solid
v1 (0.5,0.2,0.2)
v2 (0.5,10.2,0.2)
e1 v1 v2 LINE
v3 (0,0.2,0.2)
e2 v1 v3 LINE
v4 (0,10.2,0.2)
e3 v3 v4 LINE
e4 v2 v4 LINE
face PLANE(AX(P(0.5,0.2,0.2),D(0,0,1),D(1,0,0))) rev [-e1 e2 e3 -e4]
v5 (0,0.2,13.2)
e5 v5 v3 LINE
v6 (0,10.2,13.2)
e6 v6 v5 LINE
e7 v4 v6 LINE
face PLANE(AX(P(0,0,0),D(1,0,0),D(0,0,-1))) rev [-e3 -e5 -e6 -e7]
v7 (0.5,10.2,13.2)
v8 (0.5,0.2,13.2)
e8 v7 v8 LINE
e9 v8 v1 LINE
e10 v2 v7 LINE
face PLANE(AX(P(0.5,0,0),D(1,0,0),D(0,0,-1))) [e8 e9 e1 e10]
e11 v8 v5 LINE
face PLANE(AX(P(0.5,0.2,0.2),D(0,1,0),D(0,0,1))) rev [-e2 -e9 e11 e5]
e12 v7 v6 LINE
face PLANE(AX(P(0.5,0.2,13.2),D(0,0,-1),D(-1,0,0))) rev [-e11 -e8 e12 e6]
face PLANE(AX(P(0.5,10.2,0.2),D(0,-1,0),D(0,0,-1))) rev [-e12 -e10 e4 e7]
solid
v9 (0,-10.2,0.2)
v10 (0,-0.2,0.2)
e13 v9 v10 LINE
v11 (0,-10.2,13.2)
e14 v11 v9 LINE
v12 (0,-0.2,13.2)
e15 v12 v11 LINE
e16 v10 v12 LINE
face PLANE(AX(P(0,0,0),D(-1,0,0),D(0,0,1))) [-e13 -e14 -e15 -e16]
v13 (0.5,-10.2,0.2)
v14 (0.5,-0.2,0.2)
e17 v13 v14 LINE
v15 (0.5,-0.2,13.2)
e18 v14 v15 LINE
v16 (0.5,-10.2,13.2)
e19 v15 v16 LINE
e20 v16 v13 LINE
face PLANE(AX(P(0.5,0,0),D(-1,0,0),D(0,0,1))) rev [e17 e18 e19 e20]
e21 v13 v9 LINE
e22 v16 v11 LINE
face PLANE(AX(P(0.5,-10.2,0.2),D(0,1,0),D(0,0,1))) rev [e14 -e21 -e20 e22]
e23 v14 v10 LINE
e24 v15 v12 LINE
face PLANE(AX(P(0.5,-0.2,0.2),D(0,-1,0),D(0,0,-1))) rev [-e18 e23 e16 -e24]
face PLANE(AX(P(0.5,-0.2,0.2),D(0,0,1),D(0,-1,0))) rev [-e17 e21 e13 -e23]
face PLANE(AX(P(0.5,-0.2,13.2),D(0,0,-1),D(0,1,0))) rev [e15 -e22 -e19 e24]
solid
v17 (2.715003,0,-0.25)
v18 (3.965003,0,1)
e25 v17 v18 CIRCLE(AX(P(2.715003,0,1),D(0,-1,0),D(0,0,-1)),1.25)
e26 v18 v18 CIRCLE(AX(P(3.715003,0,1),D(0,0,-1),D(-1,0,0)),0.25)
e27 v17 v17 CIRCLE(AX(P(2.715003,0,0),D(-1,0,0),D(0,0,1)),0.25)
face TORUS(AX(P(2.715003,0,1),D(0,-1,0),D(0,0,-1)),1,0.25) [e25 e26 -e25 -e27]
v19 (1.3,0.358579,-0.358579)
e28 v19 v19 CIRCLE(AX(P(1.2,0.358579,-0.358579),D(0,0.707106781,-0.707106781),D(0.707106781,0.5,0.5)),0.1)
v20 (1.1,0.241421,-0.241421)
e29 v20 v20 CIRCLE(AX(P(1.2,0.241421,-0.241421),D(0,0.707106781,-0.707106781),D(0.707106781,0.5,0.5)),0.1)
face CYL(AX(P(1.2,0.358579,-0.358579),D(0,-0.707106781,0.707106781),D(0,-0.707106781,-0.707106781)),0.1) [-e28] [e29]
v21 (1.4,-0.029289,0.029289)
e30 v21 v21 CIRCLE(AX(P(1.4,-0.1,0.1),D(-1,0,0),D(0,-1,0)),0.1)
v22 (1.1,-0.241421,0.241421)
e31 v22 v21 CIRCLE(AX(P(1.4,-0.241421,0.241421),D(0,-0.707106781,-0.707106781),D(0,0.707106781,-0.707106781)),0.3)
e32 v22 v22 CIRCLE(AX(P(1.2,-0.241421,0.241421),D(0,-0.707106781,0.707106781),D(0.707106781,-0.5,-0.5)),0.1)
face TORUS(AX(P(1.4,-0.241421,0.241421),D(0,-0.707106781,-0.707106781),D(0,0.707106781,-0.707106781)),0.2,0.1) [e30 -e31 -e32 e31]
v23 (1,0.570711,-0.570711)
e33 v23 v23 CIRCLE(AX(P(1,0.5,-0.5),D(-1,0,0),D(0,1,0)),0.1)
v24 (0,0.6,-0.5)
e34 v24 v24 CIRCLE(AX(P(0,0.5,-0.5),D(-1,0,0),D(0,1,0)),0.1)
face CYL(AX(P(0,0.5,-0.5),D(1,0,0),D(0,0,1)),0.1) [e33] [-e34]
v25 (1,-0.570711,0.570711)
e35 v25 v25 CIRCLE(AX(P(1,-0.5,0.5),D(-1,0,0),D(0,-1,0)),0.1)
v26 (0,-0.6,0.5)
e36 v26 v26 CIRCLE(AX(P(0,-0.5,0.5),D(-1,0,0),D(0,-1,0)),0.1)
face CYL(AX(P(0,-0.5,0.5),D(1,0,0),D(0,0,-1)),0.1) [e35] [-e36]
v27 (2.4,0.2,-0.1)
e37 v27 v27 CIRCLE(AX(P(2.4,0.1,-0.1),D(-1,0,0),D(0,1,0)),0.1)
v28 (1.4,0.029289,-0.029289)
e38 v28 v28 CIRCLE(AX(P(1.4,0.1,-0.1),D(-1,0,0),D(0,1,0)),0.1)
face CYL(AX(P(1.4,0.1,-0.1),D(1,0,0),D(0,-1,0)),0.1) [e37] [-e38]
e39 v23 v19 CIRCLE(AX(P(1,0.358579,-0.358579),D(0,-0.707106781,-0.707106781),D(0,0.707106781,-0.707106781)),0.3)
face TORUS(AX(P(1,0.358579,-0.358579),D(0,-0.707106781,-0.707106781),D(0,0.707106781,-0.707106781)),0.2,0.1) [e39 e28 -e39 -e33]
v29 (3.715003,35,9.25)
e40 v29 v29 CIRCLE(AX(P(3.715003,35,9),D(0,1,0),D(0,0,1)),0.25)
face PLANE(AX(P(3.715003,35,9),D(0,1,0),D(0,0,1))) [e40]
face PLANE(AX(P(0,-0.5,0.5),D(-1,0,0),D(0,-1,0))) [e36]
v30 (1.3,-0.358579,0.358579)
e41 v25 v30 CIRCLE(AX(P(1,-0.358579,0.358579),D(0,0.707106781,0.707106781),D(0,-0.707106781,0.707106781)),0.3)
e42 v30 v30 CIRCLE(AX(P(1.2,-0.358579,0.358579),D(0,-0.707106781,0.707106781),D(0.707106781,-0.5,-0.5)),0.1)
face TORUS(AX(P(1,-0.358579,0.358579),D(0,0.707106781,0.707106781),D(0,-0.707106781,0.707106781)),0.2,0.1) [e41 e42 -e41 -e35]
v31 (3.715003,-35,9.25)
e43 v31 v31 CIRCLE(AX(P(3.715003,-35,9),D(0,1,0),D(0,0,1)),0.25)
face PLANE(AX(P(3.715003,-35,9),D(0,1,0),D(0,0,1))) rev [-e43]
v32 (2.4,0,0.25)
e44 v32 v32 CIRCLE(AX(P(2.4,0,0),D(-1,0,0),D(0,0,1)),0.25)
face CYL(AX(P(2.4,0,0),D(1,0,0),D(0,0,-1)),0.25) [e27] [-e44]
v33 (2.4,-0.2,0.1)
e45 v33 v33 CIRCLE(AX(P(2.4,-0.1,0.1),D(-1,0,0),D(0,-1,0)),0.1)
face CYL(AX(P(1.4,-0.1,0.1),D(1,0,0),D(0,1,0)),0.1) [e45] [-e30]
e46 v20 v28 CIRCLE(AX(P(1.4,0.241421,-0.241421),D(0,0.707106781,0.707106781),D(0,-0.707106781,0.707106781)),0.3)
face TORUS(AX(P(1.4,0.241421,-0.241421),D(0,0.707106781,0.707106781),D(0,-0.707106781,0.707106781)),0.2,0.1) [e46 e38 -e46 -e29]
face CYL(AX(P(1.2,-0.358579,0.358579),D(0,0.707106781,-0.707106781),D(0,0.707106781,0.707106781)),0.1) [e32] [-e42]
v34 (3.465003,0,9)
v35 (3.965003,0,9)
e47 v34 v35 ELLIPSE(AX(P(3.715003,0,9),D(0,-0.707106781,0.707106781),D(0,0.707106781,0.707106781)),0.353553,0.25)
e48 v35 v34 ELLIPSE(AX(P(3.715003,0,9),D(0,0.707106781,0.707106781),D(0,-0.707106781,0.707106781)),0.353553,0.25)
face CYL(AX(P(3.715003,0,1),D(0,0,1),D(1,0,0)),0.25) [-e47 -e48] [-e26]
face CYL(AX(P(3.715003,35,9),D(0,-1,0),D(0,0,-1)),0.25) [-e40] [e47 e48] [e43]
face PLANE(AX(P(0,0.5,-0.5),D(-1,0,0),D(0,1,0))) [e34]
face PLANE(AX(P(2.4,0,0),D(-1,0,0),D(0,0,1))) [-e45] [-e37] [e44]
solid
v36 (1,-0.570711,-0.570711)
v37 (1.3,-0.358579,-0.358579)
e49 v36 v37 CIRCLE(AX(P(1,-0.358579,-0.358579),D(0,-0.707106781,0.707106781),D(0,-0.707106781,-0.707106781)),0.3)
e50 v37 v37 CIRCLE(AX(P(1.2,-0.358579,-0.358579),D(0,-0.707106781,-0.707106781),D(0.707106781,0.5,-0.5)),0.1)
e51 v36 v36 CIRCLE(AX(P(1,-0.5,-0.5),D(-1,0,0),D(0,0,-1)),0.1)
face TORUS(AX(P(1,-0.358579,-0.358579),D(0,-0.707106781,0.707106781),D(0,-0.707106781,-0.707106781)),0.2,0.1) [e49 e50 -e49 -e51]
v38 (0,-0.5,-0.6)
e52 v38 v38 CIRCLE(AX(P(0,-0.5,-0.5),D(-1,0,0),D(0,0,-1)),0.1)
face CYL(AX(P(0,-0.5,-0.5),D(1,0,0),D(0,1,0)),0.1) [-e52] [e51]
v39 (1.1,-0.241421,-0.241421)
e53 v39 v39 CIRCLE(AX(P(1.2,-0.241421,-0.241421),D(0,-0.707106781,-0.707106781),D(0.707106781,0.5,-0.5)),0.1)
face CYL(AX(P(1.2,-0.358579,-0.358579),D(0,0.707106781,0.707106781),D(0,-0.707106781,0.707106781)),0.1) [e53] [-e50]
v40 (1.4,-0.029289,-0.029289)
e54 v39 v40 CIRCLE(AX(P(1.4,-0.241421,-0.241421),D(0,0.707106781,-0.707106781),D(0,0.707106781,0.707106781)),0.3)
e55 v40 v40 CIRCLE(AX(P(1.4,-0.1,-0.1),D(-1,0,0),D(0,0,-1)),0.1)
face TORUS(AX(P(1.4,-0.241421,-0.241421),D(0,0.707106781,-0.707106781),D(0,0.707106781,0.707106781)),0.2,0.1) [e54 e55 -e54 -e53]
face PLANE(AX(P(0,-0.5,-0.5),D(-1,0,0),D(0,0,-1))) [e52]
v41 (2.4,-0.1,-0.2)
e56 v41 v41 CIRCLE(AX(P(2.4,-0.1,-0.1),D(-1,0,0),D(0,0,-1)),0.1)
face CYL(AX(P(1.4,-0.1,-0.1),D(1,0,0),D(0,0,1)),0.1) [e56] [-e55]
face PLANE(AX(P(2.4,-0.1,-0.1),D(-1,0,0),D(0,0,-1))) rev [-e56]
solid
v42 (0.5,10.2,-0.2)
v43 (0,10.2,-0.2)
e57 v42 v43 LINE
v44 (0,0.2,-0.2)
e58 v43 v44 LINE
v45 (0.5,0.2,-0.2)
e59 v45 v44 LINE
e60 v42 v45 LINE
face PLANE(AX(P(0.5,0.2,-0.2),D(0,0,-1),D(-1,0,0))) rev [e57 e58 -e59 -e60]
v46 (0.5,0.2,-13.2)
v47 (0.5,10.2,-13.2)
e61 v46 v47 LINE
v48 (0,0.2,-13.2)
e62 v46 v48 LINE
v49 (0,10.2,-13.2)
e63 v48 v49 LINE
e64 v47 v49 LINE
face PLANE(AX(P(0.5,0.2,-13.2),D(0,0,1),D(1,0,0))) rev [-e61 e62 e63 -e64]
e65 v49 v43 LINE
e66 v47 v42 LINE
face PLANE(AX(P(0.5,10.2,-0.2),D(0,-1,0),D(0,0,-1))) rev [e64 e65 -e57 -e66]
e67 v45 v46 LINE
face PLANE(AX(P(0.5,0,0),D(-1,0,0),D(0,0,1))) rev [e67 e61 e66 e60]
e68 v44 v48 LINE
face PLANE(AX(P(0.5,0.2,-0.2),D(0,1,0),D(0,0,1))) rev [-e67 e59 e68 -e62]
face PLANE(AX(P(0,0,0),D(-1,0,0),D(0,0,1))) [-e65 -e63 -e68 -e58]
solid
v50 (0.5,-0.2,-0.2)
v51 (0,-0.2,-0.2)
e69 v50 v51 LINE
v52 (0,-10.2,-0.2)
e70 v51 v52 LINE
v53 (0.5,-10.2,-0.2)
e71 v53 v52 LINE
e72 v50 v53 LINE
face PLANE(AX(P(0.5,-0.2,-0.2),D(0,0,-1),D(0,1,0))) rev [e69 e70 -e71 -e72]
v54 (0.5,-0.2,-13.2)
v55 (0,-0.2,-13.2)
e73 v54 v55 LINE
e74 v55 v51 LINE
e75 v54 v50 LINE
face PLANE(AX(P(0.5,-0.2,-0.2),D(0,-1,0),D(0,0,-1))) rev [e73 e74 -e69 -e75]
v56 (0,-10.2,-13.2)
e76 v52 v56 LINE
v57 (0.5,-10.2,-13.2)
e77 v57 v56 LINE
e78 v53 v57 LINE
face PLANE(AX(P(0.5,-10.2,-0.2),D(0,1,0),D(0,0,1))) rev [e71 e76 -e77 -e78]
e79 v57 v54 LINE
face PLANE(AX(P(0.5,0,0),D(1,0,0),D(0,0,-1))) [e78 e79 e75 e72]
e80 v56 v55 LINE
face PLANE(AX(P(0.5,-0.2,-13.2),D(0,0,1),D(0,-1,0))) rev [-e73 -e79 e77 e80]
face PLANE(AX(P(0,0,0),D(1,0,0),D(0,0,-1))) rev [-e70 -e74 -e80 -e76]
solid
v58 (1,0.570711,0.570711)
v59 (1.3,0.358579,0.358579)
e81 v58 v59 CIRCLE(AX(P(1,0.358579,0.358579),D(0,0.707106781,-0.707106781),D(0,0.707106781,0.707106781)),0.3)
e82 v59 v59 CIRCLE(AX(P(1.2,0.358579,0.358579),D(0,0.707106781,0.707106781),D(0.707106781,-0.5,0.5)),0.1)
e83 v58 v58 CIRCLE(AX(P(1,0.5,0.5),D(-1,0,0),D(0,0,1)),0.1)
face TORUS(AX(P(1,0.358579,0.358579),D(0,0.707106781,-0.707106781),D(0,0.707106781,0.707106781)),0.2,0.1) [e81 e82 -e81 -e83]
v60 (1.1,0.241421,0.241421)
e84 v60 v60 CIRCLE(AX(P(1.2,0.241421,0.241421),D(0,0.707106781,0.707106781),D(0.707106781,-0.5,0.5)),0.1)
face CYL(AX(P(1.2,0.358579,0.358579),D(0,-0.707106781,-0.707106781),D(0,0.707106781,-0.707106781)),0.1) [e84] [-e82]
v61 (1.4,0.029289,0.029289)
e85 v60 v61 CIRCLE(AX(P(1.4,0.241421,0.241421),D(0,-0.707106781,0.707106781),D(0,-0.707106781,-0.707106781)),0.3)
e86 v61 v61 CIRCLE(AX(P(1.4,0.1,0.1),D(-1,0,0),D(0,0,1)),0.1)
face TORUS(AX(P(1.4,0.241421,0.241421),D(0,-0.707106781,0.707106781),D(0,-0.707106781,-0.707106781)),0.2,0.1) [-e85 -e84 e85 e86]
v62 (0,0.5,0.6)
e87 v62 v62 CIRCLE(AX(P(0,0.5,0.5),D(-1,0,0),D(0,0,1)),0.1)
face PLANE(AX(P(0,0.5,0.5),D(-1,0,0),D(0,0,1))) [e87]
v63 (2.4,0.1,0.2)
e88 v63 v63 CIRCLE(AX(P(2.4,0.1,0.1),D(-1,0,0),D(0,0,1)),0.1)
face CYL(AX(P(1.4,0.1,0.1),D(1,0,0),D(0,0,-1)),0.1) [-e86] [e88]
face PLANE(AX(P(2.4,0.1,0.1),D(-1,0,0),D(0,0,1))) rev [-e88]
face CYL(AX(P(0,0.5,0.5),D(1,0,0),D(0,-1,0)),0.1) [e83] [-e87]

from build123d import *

# Parameters (mm, degrees)
SKETCH_3_W               = 13
SKETCH_3_H               = 10
EXTRUDE_1_DEPTH          = 0.5
EXTRUDE_1_2_DEPTH        = 0.5
EXTRUDE_1_3_DEPTH        = 0.5
EXTRUDE_1_4_DEPTH        = 0.5
SWEEP_4_PROFILE_R        = 0.1
MOVE_BODY_3_OUTLINE_R    = 0.1
MOVE_BODY_3_ANGLE        = 90
MOVE_BODY_3_2_OUTLINE_R  = 0.1
MOVE_BODY_3_2_ANGLE      = 90
MOVE_BODY_3_3_OUTLINE_R  = 0.1
MOVE_BODY_3_3_DEPTH      = 1.0000001
MOVE_START               = 0.341421256
MOVE_BODY_3_4_OUTLINE_R  = 0.1
MOVE_BODY_3_4_DEPTH      = 0.165685625
MOVE_START_2             = 1.3999999
MOVE_BODY_3_5_OUTLINE_R  = 0.1
MOVE_BODY_3_5_DEPTH      = 1.0000001
MOVE_BODY_3_6_OUTLINE_R  = 0.1
MOVE_BODY_3_6_ANGLE      = 90
MOVE_BODY_3_7_OUTLINE_R  = 0.1
MOVE_BODY_3_7_ANGLE      = 90
MOVE_BODY_3_8_OUTLINE_R  = 0.1
MOVE_BODY_3_8_DEPTH      = 1.0000001
MOVE_START_3             = -0.507106881
MOVE_BODY_3_9_OUTLINE_R  = 0.1
MOVE_BODY_3_9_DEPTH      = 0.165685625
MOVE_BODY_3_10_OUTLINE_R = 0.1
MOVE_BODY_3_10_DEPTH     = 1.0000001
MOVE_BODY_3_11_OUTLINE_R = 0.1
MOVE_BODY_3_11_ANGLE     = 90
MOVE_BODY_3_12_OUTLINE_R = 0.1
MOVE_BODY_3_12_ANGLE     = 90
MOVE_BODY_3_13_OUTLINE_R = 0.1
MOVE_BODY_3_13_DEPTH     = 1.0000001
MOVE_BODY_3_14_OUTLINE_R = 0.1
MOVE_BODY_3_14_DEPTH     = 0.165685625
MOVE_BODY_3_15_OUTLINE_R = 0.1
MOVE_BODY_3_15_DEPTH     = 1.0000001
SWEEP_9_PROFILE_R        = 0.25
SKETCH_78_R              = 0.25
EXTRUDE_2_DEPTH          = 35


with BuildPart() as part:
    # 草图3 → 凸台-拉伸1 (new body)
    with BuildSketch(Plane(origin=(0, 0, 0), x_dir=(0, 0, -1), z_dir=(1, 0, 0))):
        with Locations((6.7, 5.2)):
            Rectangle(SKETCH_3_W, SKETCH_3_H)
    extrude(amount=EXTRUDE_1_DEPTH)


with BuildPart() as body_2:
    # 草图3 → Extrude 1 2 (new body)
    with BuildSketch(Plane(origin=(0, 0, 0), x_dir=(0, 0, -1), z_dir=(1, 0, 0))):
        with Locations((-6.7, -5.2)):
            Rectangle(SKETCH_3_W, SKETCH_3_H)
    extrude(amount=EXTRUDE_1_2_DEPTH)


with BuildPart() as body_3:
    # 草图3 → Extrude 1 3 (new body)
    with BuildSketch(Plane(origin=(0, 0, 0), x_dir=(0, 0, -1), z_dir=(1, 0, 0))):
        with Locations((6.7, -5.2)):
            Rectangle(SKETCH_3_W, SKETCH_3_H)
    extrude(amount=EXTRUDE_1_3_DEPTH)


with BuildPart() as body_4:
    # 草图3 → Extrude 1 4 (new body)
    with BuildSketch(Plane(origin=(0, 0, 0), x_dir=(0, 0, -1), z_dir=(1, 0, 0))):
        with Locations((-6.7, 5.2)):
            Rectangle(SKETCH_3_W, SKETCH_3_H)
    extrude(amount=EXTRUDE_1_4_DEPTH)


with BuildPart() as body_5:
    # 扫描4: sweep along a curve in space
    with BuildLine() as sweep_4_path:
        Line((0, -0.5, 0.5), (1, -0.5, 0.5))
        ThreePointArc((1, -0.5, 0.5), (1.141421356, -0.458578644, 0.458578644), (1.2, -0.358578644, 0.358578644))
        Line((1.2, -0.241421356, 0.241421356), (1.2, -0.358578644, 0.358578644))
        ThreePointArc((1.4, -0.1, 0.1), (1.258578644, -0.141421356, 0.141421356), (1.2, -0.241421356, 0.241421356))
        Line((1.4, -0.1, 0.1), (2.4, -0.1, 0.1))
    # 扫描4 profile (on start of the path) → 扫描4 (sweep)
    with BuildSketch(Plane(origin=(0, -0.5, 0.5), x_dir=(0, 0, 1), z_dir=(1, 0, 0))):
        Circle(SWEEP_4_PROFILE_R)
    sweep(path=sweep_4_path.line)



with BuildPart() as body_6:
    # Move Body 3: read off the stored shape, not the designer's step
    # Move Body 3 outline → Move Body 3 (revolve)
    with BuildSketch(Plane(origin=(1, 0.358578644, 0.358578644), x_dir=(0, 0.7071067811865401, 0.7071067811865551), z_dir=(-1, 0, 0))):
        with Locations((0.2, 0)):
            Circle(MOVE_BODY_3_OUTLINE_R)
    revolve(axis=Axis((1, 0.358578644, 0.358578644), (0, 0.7071067811865555, -0.7071067811865405)), revolution_arc=MOVE_BODY_3_ANGLE)

    # Move Body 3 2 outline → Move Body 3 2 (revolve)
    with BuildSketch(Plane(origin=(1.4, 0.241421356, 0.241421356), x_dir=(0, -0.7071067811865401, -0.7071067811865551), z_dir=(1, 0, 0))):
        with Locations((0.2, 0)):
            Circle(MOVE_BODY_3_2_OUTLINE_R)
    revolve(axis=Axis((1.4, 0.241421356, 0.241421356), (0, 0.7071067811865555, -0.7071067811865405)), revolution_arc=MOVE_BODY_3_2_ANGLE)

    # Move Body 3 3 outline → Move Body 3 3 (add)
    with BuildSketch(Plane.YZ):
        with Locations((0.5, 0.5)):
            Circle(MOVE_BODY_3_3_OUTLINE_R)
    extrude(amount=MOVE_BODY_3_3_DEPTH)

    # Move Body 3 4 outline → Move Body 3 4 (add)
    with BuildSketch(Plane(origin=(0, 0, 0), x_dir=(1, 0, 0), z_dir=(0, 0.70710678118654, 0.707106781186555)).offset(MOVE_START)):
        with Locations((1.2, 0)):
            Circle(MOVE_BODY_3_4_OUTLINE_R)
    extrude(amount=MOVE_BODY_3_4_DEPTH)

    # Move Body 3 5 outline → Move Body 3 5 (add)
    with BuildSketch(Plane.YZ.offset(MOVE_START_2)):
        with Locations((0.1, 0.1)):
            Circle(MOVE_BODY_3_5_OUTLINE_R)
    extrude(amount=MOVE_BODY_3_5_DEPTH)


with BuildPart() as body_7:
    # Move Body 3 6 outline → Move Body 3 6 (revolve)
    with BuildSketch(Plane(origin=(1, -0.358578644, -0.358578644), x_dir=(1, 0, 0), z_dir=(0, 0.707106781186545, 0.70710678118655))):
        with Locations((0.2, 0)):
            Circle(MOVE_BODY_3_6_OUTLINE_R)
    revolve(axis=Axis((1, -0.358578644, -0.358578644), (0, 0.70710678118655, -0.707106781186545)), revolution_arc=MOVE_BODY_3_6_ANGLE)

    # Move Body 3 7 outline → Move Body 3 7 (revolve)
    with BuildSketch(Plane(origin=(1.4, -0.241421356, -0.241421356), x_dir=(-1, 0, 0), z_dir=(-2.3429107291650482e-15, -0.707106781186545, -0.70710678118655))):
        with Locations((0.2, 0)):
            Circle(MOVE_BODY_3_7_OUTLINE_R)
    revolve(axis=Axis((1.4, -0.241421356, -0.241421356), (0, 0.70710678118655, -0.707106781186545)), revolution_arc=MOVE_BODY_3_7_ANGLE)

    # Move Body 3 8 outline → Move Body 3 8 (add)
    with BuildSketch(Plane.YZ):
        with Locations((-0.5, -0.5)):
            Circle(MOVE_BODY_3_8_OUTLINE_R)
    extrude(amount=MOVE_BODY_3_8_DEPTH)

    # Move Body 3 9 outline → Move Body 3 9 (add)
    with BuildSketch(Plane(origin=(0, 0, 0), x_dir=(1, 0, 0), z_dir=(0, 0.707106781186545, 0.70710678118655)).offset(MOVE_START_3)):
        with Locations((1.2, 0)):
            Circle(MOVE_BODY_3_9_OUTLINE_R)
    extrude(amount=MOVE_BODY_3_9_DEPTH)

    # Move Body 3 10 outline → Move Body 3 10 (add)
    with BuildSketch(Plane.YZ.offset(MOVE_START_2)):
        with Locations((-0.1, -0.1)):
            Circle(MOVE_BODY_3_10_OUTLINE_R)
    extrude(amount=MOVE_BODY_3_10_DEPTH)


with BuildPart() as body_8:
    # Move Body 3 11 outline → Move Body 3 11 (revolve)
    with BuildSketch(Plane(origin=(1, 0.358578644, -0.358578644), x_dir=(1, 0, 0), z_dir=(0, -0.707106781186552, 0.707106781186543))):
        with Locations((0.2, 0)):
            Circle(MOVE_BODY_3_11_OUTLINE_R)
    revolve(axis=Axis((1, 0.358578644, -0.358578644), (0, 0.707106781186543, 0.707106781186552)), revolution_arc=MOVE_BODY_3_11_ANGLE)

    # Move Body 3 12 outline → Move Body 3 12 (revolve)
    with BuildSketch(Plane(origin=(1.4, 0.241421356, -0.241421356), x_dir=(-1, 0, 0), z_dir=(0, 0.707106781186552, -0.707106781186543))):
        with Locations((0.2, 0)):
            Circle(MOVE_BODY_3_12_OUTLINE_R)
    revolve(axis=Axis((1.4, 0.241421356, -0.241421356), (0, 0.707106781186543, 0.707106781186552)), revolution_arc=MOVE_BODY_3_12_ANGLE)

    # Move Body 3 13 outline → Move Body 3 13 (add)
    with BuildSketch(Plane.YZ):
        with Locations((0.5, -0.5)):
            Circle(MOVE_BODY_3_13_OUTLINE_R)
    extrude(amount=MOVE_BODY_3_13_DEPTH)

    # Move Body 3 14 outline → Move Body 3 14 (add)
    with BuildSketch(Plane(origin=(0, 0, 0), x_dir=(1, 0, 0), z_dir=(0, 0.707106781186552, -0.707106781186543)).offset(MOVE_START)):
        with Locations((1.2, 0)):
            Circle(MOVE_BODY_3_14_OUTLINE_R)
    extrude(amount=MOVE_BODY_3_14_DEPTH)

    # Move Body 3 15 outline → Move Body 3 15 (add)
    with BuildSketch(Plane.YZ.offset(MOVE_START_2)):
        with Locations((0.1, -0.1)):
            Circle(MOVE_BODY_3_15_OUTLINE_R)
    extrude(amount=MOVE_BODY_3_15_DEPTH)


with BuildPart() as body_5_1:
    add(body_5.part)

    add(body_8.part)  # 扫描9 merges body 8
    # 扫描9: sweep along a path in 草图65
    with BuildLine(Plane(origin=(0, 0, 0), x_dir=(1, 0, 0), z_dir=(0, 1, 0))) as sweep_9_path:
        Line((2.4, 0), (2.715003177, 0))
        ThreePointArc((2.715003177, 0), (3.422109958, -0.292893219), (3.715003177, -1))
        Line((3.715003177, -1), (3.715003177, -9))
    # 扫描9 profile (on start of the path) → 扫描9 (sweep)
    with BuildSketch(Plane(origin=(2.4, 0, 0), x_dir=(0, 0, 1), z_dir=(1, 0, 0))):
        Circle(SWEEP_9_PROFILE_R)
    sweep(path=sweep_9_path.line)

    # 草图78 → 凸台-拉伸2 (add, symmetric)
    with BuildSketch(Plane(origin=(0, 0, 0), x_dir=(1, 0, 0), z_dir=(0, 1, 0))):
        with Locations(Location((3.715003177, -9, 0), (0, 0, 270))):
            Circle(SKETCH_78_R)
    extrude(amount=EXTRUDE_2_DEPTH, both=True)


solid = Compound([part.part, body_2.part, body_3.part, body_4.part, body_6.part, body_7.part, body_5_1.part])
